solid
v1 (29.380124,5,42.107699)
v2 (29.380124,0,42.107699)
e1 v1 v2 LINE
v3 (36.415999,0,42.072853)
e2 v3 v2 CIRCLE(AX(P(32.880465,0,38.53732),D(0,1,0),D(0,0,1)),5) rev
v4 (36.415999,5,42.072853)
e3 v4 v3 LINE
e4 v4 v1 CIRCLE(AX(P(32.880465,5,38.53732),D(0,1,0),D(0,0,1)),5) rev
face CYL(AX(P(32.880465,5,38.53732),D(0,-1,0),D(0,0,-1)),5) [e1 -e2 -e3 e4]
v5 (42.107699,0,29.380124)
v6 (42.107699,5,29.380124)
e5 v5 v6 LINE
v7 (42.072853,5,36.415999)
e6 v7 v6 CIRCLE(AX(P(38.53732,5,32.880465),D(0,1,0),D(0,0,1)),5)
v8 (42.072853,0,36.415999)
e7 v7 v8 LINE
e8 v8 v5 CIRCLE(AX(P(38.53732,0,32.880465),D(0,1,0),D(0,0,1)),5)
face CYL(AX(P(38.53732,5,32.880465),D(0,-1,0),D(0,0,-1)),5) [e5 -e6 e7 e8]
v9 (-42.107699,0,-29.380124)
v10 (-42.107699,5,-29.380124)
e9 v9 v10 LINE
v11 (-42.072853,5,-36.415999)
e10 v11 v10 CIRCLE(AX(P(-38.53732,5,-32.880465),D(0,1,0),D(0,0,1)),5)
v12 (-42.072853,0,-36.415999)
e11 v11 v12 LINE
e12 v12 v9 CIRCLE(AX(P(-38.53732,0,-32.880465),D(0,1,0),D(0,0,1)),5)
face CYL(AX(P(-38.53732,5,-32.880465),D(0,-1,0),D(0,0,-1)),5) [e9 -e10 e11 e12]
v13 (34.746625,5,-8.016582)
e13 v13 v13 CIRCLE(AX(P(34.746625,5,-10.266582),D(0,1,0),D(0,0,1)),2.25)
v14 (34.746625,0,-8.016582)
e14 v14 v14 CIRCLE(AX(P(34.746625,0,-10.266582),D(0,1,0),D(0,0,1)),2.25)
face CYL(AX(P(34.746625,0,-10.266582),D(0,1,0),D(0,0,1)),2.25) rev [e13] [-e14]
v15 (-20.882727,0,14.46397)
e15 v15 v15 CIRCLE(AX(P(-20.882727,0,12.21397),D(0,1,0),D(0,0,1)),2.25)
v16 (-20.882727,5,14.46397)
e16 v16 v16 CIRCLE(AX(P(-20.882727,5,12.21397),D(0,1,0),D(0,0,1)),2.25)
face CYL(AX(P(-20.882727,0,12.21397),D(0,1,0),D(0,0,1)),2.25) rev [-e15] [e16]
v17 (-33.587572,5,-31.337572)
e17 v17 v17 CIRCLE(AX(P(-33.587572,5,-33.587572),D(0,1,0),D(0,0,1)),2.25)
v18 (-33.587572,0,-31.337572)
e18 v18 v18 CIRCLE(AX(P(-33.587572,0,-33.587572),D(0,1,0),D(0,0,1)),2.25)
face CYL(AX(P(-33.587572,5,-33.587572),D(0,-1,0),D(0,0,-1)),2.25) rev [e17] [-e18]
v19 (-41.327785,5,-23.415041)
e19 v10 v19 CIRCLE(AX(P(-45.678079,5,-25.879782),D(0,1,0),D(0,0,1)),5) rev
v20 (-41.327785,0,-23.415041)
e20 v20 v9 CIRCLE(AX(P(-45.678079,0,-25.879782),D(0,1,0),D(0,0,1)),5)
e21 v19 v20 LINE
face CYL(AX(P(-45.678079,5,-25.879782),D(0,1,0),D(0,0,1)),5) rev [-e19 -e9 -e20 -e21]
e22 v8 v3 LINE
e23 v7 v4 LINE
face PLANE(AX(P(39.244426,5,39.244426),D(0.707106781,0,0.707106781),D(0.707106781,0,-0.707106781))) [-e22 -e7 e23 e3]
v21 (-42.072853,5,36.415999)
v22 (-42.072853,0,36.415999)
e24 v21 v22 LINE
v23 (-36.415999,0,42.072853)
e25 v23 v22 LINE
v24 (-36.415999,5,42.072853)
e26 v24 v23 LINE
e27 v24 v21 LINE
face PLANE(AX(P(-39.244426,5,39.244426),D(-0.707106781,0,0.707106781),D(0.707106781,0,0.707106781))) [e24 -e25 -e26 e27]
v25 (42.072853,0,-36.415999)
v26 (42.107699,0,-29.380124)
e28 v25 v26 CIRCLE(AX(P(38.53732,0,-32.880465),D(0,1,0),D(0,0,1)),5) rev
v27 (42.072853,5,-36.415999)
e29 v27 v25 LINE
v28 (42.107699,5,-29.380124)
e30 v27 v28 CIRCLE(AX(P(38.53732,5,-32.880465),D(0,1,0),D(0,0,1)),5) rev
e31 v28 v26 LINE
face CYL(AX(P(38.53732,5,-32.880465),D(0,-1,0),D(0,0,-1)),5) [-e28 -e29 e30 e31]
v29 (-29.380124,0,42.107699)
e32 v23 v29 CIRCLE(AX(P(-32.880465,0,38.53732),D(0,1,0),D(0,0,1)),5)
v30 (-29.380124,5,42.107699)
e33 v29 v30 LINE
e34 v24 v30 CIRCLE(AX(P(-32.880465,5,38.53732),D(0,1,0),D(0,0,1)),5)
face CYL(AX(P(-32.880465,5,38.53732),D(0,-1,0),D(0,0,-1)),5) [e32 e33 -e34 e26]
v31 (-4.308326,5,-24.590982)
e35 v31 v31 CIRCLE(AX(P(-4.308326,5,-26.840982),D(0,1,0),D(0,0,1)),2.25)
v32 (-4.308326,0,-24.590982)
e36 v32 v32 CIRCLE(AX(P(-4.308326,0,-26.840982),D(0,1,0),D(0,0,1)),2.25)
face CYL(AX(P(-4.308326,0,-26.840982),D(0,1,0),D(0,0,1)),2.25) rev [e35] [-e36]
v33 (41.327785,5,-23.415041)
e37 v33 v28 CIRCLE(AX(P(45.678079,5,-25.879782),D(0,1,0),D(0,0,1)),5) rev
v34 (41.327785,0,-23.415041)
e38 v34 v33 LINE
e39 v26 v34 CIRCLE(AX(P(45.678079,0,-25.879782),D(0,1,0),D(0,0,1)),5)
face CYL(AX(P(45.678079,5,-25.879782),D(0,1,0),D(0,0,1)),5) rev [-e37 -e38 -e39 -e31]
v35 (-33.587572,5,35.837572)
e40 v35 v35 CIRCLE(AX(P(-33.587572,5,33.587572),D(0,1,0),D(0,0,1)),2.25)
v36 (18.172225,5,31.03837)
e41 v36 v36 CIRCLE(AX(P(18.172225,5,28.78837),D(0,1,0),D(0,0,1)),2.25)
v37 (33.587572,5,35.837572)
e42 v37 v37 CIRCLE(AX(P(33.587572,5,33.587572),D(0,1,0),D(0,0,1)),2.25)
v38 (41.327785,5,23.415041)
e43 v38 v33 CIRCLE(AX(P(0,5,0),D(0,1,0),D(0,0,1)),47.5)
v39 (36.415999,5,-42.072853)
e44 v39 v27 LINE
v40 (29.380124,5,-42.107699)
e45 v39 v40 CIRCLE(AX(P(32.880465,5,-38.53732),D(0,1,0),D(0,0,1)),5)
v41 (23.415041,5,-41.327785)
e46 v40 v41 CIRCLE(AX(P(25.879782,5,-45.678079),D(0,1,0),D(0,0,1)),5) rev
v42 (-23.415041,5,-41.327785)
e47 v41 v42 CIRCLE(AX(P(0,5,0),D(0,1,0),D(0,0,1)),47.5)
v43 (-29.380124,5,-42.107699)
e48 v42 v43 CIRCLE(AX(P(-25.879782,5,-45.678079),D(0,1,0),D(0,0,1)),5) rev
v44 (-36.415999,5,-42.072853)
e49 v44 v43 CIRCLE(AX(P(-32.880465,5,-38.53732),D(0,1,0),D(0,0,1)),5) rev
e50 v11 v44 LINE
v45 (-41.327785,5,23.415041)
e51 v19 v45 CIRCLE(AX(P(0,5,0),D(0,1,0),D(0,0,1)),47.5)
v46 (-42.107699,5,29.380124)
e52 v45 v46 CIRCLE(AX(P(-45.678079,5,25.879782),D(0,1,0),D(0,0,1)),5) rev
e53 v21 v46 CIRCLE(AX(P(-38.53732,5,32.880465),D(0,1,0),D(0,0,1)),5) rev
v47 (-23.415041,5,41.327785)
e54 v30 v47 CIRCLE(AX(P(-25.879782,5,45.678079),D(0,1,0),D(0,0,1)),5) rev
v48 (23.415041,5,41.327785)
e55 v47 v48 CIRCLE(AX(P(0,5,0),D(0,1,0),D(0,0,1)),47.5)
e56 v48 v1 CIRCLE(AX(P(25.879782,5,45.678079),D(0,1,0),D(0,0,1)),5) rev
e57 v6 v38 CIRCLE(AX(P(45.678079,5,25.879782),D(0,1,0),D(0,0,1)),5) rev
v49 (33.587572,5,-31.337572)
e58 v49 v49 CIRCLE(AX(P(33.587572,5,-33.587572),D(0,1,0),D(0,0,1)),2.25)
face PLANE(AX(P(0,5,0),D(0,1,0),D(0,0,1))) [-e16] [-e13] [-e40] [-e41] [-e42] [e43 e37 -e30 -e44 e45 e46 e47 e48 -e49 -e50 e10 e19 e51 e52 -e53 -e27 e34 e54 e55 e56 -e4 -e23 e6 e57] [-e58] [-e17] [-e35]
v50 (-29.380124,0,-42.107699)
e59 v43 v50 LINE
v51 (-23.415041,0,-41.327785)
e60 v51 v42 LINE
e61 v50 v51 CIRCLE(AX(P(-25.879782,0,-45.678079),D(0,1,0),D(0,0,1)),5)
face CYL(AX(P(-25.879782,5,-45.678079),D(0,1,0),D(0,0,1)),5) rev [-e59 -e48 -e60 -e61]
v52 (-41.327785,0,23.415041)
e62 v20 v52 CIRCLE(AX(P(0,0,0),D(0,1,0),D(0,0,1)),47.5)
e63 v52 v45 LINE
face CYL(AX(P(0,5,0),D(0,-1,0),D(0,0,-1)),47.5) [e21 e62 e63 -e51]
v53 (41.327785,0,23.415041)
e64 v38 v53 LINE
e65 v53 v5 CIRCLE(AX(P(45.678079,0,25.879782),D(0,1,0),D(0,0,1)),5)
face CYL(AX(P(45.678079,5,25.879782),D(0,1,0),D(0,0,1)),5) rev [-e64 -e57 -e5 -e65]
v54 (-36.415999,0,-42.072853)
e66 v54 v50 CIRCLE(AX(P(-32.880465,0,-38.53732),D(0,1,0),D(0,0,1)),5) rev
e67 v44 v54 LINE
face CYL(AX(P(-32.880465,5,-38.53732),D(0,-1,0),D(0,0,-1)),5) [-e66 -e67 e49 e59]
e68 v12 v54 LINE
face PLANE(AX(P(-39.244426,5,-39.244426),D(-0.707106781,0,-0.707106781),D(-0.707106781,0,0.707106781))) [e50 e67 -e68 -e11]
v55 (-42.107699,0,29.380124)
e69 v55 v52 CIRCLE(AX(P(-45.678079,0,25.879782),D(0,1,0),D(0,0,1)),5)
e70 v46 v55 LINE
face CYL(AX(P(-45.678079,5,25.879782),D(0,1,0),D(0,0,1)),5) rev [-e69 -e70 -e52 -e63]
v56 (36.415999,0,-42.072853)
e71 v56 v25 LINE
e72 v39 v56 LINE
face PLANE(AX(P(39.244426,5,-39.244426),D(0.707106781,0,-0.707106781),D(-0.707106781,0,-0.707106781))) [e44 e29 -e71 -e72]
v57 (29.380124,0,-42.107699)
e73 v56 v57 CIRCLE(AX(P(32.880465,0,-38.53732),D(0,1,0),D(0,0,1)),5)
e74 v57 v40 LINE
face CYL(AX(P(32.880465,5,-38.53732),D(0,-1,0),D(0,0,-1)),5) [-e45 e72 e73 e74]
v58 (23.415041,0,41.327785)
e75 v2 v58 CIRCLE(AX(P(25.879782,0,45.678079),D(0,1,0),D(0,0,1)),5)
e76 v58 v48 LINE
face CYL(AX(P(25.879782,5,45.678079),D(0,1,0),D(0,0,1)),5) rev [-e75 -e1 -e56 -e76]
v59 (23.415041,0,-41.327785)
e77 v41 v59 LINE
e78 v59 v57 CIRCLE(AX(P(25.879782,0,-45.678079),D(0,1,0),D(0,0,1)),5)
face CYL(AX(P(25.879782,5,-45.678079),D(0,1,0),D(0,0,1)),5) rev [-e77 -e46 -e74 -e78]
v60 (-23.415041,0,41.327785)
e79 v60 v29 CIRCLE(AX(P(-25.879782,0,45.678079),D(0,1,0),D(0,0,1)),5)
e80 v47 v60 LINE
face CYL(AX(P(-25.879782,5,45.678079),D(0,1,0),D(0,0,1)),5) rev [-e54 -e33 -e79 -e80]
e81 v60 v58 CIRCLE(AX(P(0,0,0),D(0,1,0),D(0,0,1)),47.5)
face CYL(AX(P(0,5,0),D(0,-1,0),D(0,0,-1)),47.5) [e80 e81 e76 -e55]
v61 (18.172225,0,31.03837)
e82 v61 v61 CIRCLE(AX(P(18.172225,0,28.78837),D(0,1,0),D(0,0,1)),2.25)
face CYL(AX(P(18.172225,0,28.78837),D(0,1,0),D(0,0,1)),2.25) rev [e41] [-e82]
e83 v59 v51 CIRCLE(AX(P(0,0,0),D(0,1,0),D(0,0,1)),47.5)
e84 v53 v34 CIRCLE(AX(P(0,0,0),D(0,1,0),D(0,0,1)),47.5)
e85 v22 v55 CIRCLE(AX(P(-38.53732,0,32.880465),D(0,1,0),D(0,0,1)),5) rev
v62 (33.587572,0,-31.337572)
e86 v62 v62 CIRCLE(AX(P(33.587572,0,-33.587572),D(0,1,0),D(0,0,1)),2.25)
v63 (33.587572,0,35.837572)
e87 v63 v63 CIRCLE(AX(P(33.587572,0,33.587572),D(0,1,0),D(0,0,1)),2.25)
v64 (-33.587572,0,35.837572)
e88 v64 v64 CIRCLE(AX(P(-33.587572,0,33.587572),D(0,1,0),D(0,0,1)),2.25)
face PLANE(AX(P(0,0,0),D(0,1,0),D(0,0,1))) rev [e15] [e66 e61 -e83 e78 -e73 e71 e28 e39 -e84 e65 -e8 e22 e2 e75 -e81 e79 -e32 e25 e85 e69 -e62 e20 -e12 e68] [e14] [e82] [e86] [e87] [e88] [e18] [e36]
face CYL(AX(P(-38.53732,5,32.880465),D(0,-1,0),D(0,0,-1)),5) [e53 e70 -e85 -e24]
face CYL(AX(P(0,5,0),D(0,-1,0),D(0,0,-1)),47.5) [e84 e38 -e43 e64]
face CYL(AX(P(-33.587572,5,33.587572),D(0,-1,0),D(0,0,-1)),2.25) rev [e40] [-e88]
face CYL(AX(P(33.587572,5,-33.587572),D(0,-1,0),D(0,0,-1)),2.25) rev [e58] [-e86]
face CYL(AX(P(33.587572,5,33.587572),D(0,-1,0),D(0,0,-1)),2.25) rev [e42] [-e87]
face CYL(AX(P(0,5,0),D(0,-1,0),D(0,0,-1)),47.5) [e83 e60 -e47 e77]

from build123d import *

# Parameters (mm, degrees)
SKETCH3_R           = 2.25
BOSS_EXTRUDE2_DEPTH = 5
FILLET2_R           = 5
SKETCH4_R           = 2.25
CUT_EXTRUDE1_DEPTH  = 68.360968075


with BuildPart() as part:
    # Sketch3 → Boss-Extrude2 (new body)
    with BuildSketch(Plane(origin=(0, 0, 0), x_dir=(1, 0, 0), z_dir=(0, 1, 0))):
        with BuildLine():
            Line((42.072853481, 36.415999231), (36.415999231, 42.072853481))
            ThreePointArc((36.415999231, 42.072853481), (32.880465325, 43.537319575), (29.344931419, 42.072853481))
            Line((29.344931419, 42.072853481), (26.615199056, 39.343121117))
            ThreePointArc((26.615199056, 39.343121117), (0, 47.5), (-26.615199056, 39.343121117))
            Line((-26.615199056, 39.343121117), (-29.344931419, 42.072853481))
            ThreePointArc((-29.344931419, 42.072853481), (-32.880465325, 43.537319575), (-36.415999231, 42.072853481))
            Line((-36.415999231, 42.072853481), (-42.072853481, 36.415999231))
            ThreePointArc((-42.072853481, 36.415999231), (-43.537319575, 32.880465325), (-42.072853481, 29.344931419))
            Line((-42.072853481, 29.344931419), (-39.343121117, 26.615199056))
            ThreePointArc((-39.343121117, 26.615199056), (-47.5, 0), (-39.343121117, -26.615199056))
            Line((-39.343121117, -26.615199056), (-42.072853481, -29.344931419))
            ThreePointArc((-42.072853481, -29.344931419), (-43.537319575, -32.880465325), (-42.072853481, -36.415999231))
            Line((-42.072853481, -36.415999231), (-36.415999231, -42.072853481))
            ThreePointArc((-36.415999231, -42.072853481), (-32.880465325, -43.537319575), (-29.344931419, -42.072853481))
            Line((-29.344931419, -42.072853481), (-26.615199056, -39.343121117))
            ThreePointArc((-26.615199056, -39.343121117), (0, -47.5), (26.615199056, -39.343121117))
            Line((26.615199056, -39.343121117), (29.344931419, -42.072853481))
            ThreePointArc((29.344931419, -42.072853481), (32.880465325, -43.537319575), (36.415999231, -42.072853481))
            Line((36.415999231, -42.072853481), (42.072853481, -36.415999231))
            ThreePointArc((42.072853481, -36.415999231), (43.537319575, -32.880465325), (42.072853481, -29.344931419))
            Line((42.072853481, -29.344931419), (39.343121117, -26.615199056))
            ThreePointArc((39.343121117, -26.615199056), (47.5, 0), (39.343121117, 26.615199056))
            Line((39.343121117, 26.615199056), (42.072853481, 29.344931419))
            ThreePointArc((42.072853481, 29.344931419), (43.537319575, 32.880465325), (42.072853481, 36.415999231))
        make_face()
        with Locations((33.587572106, 33.587572106)):
            Circle(SKETCH3_R, mode=Mode.SUBTRACT)
        with Locations((-33.587572106, 33.587572106)):
            Circle(SKETCH3_R, mode=Mode.SUBTRACT)
        with Locations((33.587572106, -33.587572106)):
            Circle(SKETCH3_R, mode=Mode.SUBTRACT)
        with Locations((-33.587572106, -33.587572106)):
            Circle(SKETCH3_R, mode=Mode.SUBTRACT)
    extrude(amount=BOSS_EXTRUDE2_DEPTH)

    # Fillet2
    fillet2_edges = [part.edges().sort_by_distance(p)[0] for p in [
        (26.615199056, 2.5, 39.343121117),
        (-26.615199056, 2.5, 39.343121117),
        (-39.343121117, 2.5, 26.615199056),
        (-39.343121117, 2.5, -26.615199056),
        (-26.615199056, 2.5, -39.343121117),
        (26.615199056, 2.5, -39.343121117),
        (39.343121117, 2.5, -26.615199056),
        (39.343121117, 2.5, 26.615199056),
    ]]
    fillet(fillet2_edges, radius=FILLET2_R)

    # Sketch4 → Cut-Extrude1 (cut, through all)
    with BuildSketch(Plane(origin=(0, 5, 0), x_dir=(1, 0, 0), z_dir=(0, 1, 0))):
        with Locations((-20.882726769, -12.213969589)):
            Circle(SKETCH4_R)
        with Locations((-4.308326491, 26.840982151)):
            Circle(SKETCH4_R)
        with Locations((34.746625249, 10.266581873)):
            Circle(SKETCH4_R)
        with Locations((18.172224972, -28.788369867)):
            Circle(SKETCH4_R)
    extrude(amount=-CUT_EXTRUDE1_DEPTH, mode=Mode.SUBTRACT)


solid = part.part
